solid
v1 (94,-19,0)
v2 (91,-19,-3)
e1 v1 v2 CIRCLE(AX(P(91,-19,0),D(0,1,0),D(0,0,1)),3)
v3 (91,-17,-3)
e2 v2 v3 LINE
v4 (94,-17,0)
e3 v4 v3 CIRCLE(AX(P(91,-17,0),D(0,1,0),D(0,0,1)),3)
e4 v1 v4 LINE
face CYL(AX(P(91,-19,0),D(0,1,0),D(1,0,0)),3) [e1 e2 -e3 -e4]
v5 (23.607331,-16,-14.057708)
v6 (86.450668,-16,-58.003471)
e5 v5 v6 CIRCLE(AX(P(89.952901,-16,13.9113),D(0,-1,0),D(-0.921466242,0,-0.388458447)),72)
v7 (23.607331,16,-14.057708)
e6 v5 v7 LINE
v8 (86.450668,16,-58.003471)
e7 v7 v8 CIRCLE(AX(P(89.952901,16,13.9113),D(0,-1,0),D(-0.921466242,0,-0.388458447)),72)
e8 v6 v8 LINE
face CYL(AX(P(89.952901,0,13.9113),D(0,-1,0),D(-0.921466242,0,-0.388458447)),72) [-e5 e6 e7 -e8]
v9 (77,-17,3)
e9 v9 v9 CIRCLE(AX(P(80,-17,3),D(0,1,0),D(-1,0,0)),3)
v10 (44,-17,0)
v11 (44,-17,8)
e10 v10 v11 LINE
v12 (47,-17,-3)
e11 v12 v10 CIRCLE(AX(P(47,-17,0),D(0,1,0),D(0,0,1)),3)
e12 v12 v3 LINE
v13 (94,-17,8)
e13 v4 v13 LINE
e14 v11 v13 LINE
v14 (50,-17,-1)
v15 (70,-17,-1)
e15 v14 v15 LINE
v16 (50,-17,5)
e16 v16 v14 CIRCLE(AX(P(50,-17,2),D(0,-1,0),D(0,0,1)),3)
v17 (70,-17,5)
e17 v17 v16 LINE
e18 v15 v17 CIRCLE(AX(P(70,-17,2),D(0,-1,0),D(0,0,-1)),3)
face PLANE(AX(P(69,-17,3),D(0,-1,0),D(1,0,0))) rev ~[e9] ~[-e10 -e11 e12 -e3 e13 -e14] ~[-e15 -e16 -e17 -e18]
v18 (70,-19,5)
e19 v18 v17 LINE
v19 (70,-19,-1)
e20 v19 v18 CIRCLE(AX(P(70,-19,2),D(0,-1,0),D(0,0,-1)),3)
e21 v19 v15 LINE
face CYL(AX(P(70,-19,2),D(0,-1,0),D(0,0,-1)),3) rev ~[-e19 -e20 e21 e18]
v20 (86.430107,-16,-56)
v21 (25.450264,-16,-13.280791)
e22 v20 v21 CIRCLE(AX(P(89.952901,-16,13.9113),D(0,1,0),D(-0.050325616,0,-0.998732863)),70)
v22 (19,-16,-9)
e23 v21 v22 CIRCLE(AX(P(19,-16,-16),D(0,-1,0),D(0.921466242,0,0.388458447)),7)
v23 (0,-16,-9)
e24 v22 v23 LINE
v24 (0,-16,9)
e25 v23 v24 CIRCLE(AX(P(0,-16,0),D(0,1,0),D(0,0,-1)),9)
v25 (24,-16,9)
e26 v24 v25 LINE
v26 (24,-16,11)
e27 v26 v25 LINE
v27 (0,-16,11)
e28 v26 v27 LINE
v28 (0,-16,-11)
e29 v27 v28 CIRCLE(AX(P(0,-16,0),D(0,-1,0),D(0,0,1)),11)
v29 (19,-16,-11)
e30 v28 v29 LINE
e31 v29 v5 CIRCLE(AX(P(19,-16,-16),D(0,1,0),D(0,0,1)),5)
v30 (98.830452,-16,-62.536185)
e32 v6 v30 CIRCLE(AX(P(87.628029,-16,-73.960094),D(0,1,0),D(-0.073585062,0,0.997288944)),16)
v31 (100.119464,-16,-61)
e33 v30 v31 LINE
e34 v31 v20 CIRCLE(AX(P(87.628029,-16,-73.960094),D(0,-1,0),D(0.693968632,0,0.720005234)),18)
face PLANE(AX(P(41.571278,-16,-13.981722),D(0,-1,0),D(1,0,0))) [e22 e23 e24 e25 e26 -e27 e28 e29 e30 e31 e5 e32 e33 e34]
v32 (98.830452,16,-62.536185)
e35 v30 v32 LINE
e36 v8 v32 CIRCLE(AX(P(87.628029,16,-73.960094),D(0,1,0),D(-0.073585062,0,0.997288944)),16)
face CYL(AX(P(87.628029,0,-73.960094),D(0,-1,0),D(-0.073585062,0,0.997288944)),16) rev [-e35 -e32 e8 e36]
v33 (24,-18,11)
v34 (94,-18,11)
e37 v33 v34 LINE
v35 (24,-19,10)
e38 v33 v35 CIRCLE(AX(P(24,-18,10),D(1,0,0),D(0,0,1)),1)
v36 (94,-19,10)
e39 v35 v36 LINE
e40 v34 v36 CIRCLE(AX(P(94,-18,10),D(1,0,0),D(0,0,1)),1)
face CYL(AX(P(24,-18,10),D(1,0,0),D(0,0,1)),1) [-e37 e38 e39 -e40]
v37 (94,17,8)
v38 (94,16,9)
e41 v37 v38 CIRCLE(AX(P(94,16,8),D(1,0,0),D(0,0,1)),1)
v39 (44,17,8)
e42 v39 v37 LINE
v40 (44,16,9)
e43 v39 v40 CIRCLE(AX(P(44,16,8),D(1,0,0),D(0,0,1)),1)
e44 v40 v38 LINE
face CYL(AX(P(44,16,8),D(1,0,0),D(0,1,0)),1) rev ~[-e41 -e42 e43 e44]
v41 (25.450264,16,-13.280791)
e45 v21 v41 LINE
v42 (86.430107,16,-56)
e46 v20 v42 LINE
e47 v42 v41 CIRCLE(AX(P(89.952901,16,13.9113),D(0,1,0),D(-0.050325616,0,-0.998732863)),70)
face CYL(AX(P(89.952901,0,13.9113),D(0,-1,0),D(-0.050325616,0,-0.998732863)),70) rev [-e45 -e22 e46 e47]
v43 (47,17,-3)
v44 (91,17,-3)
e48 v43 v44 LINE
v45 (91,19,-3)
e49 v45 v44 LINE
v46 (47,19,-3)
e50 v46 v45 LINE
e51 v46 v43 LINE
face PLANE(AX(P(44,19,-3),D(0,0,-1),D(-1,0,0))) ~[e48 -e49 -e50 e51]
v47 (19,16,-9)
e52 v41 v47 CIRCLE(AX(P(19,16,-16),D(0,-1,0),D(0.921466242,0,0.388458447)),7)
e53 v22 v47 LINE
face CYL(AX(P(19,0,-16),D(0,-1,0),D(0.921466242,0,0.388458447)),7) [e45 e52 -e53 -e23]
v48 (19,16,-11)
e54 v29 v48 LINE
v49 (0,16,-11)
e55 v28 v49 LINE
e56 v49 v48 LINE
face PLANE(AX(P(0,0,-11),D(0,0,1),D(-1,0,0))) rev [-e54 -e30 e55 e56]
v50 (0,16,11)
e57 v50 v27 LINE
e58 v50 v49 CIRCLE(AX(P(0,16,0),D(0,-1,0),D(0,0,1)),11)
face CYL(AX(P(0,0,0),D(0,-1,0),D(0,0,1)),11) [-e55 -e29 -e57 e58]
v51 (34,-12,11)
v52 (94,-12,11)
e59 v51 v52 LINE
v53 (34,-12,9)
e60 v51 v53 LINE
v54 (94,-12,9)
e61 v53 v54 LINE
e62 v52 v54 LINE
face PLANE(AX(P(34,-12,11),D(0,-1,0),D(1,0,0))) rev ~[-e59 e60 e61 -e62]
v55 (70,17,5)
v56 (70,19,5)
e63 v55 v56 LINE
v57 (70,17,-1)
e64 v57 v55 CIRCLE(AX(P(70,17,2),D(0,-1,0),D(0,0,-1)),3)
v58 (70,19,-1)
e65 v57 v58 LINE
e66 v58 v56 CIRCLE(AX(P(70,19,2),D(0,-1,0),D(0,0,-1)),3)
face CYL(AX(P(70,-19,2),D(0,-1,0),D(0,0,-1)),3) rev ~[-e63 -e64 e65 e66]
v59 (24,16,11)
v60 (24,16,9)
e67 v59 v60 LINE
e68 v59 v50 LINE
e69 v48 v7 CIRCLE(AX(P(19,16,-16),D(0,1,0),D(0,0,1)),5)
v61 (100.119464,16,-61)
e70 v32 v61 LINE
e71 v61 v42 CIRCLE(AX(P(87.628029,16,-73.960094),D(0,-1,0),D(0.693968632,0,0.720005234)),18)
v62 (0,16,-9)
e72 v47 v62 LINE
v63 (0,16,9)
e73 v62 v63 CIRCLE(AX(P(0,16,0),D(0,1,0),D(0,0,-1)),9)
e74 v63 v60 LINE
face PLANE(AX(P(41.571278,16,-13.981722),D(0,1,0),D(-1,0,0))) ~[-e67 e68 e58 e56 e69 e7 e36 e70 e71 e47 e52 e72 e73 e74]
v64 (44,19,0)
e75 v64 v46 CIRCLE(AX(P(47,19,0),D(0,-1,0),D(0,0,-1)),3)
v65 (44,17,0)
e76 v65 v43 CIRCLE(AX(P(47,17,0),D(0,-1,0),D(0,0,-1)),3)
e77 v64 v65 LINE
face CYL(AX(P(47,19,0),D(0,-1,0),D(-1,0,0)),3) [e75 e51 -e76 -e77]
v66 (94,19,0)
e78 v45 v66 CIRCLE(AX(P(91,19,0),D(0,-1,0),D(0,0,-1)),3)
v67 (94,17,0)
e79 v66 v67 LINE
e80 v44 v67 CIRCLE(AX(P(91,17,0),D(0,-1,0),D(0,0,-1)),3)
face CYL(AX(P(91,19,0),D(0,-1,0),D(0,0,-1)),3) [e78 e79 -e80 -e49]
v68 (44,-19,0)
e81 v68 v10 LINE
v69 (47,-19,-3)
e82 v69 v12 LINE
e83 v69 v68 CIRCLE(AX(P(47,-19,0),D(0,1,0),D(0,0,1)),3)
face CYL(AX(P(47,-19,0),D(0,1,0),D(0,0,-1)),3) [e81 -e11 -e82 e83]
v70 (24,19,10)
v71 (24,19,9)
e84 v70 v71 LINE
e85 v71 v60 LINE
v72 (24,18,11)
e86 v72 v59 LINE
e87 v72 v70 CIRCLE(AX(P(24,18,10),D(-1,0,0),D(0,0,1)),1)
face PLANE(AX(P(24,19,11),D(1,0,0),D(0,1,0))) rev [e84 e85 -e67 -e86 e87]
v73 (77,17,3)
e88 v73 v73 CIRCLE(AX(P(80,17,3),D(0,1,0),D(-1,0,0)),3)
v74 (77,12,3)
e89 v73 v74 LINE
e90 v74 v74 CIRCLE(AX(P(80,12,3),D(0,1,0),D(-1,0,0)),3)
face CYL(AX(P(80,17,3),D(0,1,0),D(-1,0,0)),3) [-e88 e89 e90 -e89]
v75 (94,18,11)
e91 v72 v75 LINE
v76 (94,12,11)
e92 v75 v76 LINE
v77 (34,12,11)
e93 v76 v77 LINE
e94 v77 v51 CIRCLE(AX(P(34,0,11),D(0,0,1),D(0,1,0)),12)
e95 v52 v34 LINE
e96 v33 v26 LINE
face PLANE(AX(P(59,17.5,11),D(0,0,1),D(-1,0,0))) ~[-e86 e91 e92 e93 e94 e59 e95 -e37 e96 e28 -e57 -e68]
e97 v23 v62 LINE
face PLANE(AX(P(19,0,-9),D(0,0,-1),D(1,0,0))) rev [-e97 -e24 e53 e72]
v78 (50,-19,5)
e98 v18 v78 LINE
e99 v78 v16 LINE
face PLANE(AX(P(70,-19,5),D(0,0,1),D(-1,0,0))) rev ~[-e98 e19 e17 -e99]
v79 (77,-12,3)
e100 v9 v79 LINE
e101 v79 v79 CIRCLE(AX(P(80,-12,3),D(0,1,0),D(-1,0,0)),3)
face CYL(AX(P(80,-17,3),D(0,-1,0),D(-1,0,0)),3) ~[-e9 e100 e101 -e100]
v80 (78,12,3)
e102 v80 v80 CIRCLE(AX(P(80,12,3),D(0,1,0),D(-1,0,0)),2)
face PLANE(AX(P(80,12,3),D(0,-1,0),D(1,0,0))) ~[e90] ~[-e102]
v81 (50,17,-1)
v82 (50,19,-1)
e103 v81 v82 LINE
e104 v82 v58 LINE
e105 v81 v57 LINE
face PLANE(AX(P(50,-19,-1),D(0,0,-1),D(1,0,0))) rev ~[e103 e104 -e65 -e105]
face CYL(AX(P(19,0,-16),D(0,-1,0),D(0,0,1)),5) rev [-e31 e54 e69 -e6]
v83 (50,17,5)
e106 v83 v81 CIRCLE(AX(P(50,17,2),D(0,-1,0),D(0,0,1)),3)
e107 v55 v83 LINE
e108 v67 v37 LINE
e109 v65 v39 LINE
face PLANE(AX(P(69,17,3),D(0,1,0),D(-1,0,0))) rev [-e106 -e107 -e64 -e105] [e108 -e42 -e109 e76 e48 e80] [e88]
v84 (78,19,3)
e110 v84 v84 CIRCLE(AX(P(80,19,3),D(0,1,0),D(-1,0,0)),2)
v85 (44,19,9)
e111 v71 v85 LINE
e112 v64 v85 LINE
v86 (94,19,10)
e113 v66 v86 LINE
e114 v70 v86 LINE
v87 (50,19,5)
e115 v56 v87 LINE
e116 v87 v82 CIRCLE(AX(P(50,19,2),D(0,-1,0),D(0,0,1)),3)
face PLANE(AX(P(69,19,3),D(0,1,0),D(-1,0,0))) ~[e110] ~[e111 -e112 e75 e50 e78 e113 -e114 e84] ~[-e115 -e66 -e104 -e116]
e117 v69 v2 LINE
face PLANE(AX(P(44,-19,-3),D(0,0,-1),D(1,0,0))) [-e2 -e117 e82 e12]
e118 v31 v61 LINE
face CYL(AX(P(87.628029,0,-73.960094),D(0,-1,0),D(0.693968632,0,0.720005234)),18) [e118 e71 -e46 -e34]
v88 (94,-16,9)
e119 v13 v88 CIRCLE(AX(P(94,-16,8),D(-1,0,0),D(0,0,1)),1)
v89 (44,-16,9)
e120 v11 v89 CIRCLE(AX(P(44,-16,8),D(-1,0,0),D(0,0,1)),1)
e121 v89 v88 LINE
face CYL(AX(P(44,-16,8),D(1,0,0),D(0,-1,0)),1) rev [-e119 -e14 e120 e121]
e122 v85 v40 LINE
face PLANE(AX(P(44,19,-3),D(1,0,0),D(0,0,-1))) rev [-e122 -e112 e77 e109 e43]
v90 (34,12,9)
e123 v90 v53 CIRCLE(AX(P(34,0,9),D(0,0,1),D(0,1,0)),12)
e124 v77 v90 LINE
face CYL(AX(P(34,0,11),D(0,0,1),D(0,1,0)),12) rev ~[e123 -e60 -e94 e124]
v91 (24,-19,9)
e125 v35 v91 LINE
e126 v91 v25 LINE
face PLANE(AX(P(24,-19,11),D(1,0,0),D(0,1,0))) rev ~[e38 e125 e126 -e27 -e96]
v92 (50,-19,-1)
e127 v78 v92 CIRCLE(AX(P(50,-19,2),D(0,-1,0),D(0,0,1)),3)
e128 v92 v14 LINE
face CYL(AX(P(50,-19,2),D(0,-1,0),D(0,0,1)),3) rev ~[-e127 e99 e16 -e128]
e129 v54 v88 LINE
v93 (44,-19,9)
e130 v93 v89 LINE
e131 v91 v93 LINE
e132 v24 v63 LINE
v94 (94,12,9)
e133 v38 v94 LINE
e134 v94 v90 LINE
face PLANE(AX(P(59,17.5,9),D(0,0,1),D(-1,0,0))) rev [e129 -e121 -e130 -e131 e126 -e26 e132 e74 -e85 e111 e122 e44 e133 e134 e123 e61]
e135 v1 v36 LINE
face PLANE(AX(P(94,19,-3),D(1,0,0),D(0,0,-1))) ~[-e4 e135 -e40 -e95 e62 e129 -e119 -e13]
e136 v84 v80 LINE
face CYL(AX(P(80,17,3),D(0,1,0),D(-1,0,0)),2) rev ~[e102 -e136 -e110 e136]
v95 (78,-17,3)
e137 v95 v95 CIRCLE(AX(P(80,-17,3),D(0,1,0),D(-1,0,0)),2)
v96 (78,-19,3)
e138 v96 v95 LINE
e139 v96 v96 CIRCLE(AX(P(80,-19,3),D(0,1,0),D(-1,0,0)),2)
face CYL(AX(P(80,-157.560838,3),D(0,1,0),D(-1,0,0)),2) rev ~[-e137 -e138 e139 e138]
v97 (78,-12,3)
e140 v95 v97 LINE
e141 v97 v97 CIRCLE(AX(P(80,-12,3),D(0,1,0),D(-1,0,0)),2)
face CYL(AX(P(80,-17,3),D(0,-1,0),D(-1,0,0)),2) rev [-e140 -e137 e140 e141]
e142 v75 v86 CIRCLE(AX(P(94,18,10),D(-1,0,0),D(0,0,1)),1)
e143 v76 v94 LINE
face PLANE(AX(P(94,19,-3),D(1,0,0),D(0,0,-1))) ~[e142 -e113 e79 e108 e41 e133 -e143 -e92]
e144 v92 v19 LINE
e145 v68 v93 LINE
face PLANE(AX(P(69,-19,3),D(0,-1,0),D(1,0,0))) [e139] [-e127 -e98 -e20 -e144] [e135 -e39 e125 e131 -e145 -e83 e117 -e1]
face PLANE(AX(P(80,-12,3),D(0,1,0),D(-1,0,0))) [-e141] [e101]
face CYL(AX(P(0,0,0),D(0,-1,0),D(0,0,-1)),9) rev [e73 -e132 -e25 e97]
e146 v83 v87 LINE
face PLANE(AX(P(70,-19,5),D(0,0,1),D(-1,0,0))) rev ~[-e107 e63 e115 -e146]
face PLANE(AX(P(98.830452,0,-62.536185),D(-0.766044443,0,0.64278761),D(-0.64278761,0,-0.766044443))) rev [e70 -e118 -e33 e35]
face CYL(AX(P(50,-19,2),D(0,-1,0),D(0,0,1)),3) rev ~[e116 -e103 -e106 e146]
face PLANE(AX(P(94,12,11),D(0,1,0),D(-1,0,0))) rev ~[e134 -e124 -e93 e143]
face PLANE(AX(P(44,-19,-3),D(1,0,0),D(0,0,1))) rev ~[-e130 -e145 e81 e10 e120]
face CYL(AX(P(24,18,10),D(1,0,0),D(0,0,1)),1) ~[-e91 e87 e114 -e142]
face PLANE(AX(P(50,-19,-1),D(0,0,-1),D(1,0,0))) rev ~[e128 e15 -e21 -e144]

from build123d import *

# Parameters (mm, degrees)
F1_DEPTH  = 16
F2_W      = 70
F2_H      = 3
F3_DEPTH  = 2
F4_W      = 50
F4_H      = 12
F5_DEPTH  = 2
F6_R      = 1
F9_DEPTH  = 2
F11_DEPTH = 38.001
F13_D     = 4
F14_R     = 3
F14_R_2   = 2
F15_DEPTH = 5
F16_R     = 3


# Not quite as in the source:
# - a pattern or mirror of a feature is missing from the dataset's text; its kind, count and spacing are read off the source's solid


with BuildPart() as f1:
    # F0 (on Front) → F1 (new body)
    with BuildSketch(Plane.XZ):
        with BuildLine():
            Line((94, 11), (0, 11))
            ThreePointArc((0, 11), (-11, 0), (0, -11))
            Line((0, -11), (19, -11))
            ThreePointArc((19, -11), (21.7648271935, -11.8339790459), (23.607331209, -14.0577077639))
            ThreePointArc((23.607331209, -14.0577077639), (48.6917034204, -45.0930519948), (86.4506679072, -58.0034711071))
            ThreePointArc((86.4506679072, -58.0034711071), (93.1291053538, -58.9355091014), (98.8304523125, -62.5361846502))
            Line((98.8304523125, -62.5361846502), (100.1194642859, -61))
            ThreePointArc((100.1194642859, -61), (93.803453137, -57.0525770858), (86.4301074938, -56))
            ThreePointArc((86.4301074938, -56), (49.7895156694, -43.4202136678), (25.4502636926, -13.2807908695))
            ThreePointArc((25.4502636926, -13.2807908695), (22.8707580709, -10.1675706642), (19, -9))
            Line((19, -9), (0, -9))
            ThreePointArc((0, -9), (-9, 0), (0, 9))
            Line((0, 9), (94, 9))
            Line((94, 9), (94, 11))
        make_face()
    extrude(amount=F1_DEPTH)

    # F2 (on face) → F3 (join)
    with BuildSketch(Plane.XY.offset(11)):
        with Locations((59, -17.5)):
            Rectangle(F2_W, F2_H)
    extrude(amount=-F3_DEPTH)

    # F4 (on face) → F5 (join)
    with BuildSketch(Plane.XZ.offset(19)):
        with Locations((69, 3)):
            Rectangle(F4_W, F4_H)
    extrude(amount=-F5_DEPTH)

    # F6
    f6_edges = [f1.edges().sort_by_distance(p)[0] for p in [
        (59, -19, 11),
        (69, -17, 9),
    ]]
    fillet(f6_edges, radius=F6_R)

    # F7: F1 across plane


with BuildPart() as f1_1:
    add(f1.part)
    add(f1.part.mirror(Plane.XZ))

    # F8 (on face) → F9 (cut)
    with BuildSketch(Plane.XY.offset(11)):
        with BuildLine():
            Line((94, 12), (34, 12))
            ThreePointArc((34, 12), (22, 0), (34, -12))
            Line((34, -12), (94, -12))
            Line((94, -12), (94, 12))
        make_face()
    extrude(amount=-F9_DEPTH, mode=Mode.SUBTRACT)

    # F10 (on face) → F11 (cut, through all)
    with BuildSketch(Plane.XZ.offset(19)):
        with BuildLine():
            ThreePointArc((50, 5), (47, 2), (50, -1))
            Line((50, -1), (70, -1))
            ThreePointArc((70, -1), (73, 2), (70, 5))
            Line((70, 5), (50, 5))
        make_face()
    extrude(amount=-F11_DEPTH, mode=Mode.SUBTRACT)

    # F13 (through all)
    with Locations(Plane.XZ.offset(19)):
        with Locations((80, 3)):
            Hole(F13_D / 2)

    # F14 (on face) → F15 (join)
    with BuildSketch(Plane(origin=(0, -17, 0), x_dir=(-1, 0, 0), z_dir=(0, 1, 0))):
        with Locations((-80, 3)):
            Circle(F14_R)
        with Locations((-80, 3)):
            Circle(F14_R_2, mode=Mode.SUBTRACT)
    f15 = extrude(amount=F15_DEPTH)

    # F15_copies: F15 across plane
    add(f15.mirror(Plane.ZX))

    # F16
    f16_edges = [f1_1.edges().sort_by_distance(p)[0] for p in [
        (94, 18, -3),
        (44, 18, -3),
        (44, -18, -3),
        (94, -18, -3),
    ]]
    fillet(f16_edges, radius=F16_R)


solid = f1_1.part
